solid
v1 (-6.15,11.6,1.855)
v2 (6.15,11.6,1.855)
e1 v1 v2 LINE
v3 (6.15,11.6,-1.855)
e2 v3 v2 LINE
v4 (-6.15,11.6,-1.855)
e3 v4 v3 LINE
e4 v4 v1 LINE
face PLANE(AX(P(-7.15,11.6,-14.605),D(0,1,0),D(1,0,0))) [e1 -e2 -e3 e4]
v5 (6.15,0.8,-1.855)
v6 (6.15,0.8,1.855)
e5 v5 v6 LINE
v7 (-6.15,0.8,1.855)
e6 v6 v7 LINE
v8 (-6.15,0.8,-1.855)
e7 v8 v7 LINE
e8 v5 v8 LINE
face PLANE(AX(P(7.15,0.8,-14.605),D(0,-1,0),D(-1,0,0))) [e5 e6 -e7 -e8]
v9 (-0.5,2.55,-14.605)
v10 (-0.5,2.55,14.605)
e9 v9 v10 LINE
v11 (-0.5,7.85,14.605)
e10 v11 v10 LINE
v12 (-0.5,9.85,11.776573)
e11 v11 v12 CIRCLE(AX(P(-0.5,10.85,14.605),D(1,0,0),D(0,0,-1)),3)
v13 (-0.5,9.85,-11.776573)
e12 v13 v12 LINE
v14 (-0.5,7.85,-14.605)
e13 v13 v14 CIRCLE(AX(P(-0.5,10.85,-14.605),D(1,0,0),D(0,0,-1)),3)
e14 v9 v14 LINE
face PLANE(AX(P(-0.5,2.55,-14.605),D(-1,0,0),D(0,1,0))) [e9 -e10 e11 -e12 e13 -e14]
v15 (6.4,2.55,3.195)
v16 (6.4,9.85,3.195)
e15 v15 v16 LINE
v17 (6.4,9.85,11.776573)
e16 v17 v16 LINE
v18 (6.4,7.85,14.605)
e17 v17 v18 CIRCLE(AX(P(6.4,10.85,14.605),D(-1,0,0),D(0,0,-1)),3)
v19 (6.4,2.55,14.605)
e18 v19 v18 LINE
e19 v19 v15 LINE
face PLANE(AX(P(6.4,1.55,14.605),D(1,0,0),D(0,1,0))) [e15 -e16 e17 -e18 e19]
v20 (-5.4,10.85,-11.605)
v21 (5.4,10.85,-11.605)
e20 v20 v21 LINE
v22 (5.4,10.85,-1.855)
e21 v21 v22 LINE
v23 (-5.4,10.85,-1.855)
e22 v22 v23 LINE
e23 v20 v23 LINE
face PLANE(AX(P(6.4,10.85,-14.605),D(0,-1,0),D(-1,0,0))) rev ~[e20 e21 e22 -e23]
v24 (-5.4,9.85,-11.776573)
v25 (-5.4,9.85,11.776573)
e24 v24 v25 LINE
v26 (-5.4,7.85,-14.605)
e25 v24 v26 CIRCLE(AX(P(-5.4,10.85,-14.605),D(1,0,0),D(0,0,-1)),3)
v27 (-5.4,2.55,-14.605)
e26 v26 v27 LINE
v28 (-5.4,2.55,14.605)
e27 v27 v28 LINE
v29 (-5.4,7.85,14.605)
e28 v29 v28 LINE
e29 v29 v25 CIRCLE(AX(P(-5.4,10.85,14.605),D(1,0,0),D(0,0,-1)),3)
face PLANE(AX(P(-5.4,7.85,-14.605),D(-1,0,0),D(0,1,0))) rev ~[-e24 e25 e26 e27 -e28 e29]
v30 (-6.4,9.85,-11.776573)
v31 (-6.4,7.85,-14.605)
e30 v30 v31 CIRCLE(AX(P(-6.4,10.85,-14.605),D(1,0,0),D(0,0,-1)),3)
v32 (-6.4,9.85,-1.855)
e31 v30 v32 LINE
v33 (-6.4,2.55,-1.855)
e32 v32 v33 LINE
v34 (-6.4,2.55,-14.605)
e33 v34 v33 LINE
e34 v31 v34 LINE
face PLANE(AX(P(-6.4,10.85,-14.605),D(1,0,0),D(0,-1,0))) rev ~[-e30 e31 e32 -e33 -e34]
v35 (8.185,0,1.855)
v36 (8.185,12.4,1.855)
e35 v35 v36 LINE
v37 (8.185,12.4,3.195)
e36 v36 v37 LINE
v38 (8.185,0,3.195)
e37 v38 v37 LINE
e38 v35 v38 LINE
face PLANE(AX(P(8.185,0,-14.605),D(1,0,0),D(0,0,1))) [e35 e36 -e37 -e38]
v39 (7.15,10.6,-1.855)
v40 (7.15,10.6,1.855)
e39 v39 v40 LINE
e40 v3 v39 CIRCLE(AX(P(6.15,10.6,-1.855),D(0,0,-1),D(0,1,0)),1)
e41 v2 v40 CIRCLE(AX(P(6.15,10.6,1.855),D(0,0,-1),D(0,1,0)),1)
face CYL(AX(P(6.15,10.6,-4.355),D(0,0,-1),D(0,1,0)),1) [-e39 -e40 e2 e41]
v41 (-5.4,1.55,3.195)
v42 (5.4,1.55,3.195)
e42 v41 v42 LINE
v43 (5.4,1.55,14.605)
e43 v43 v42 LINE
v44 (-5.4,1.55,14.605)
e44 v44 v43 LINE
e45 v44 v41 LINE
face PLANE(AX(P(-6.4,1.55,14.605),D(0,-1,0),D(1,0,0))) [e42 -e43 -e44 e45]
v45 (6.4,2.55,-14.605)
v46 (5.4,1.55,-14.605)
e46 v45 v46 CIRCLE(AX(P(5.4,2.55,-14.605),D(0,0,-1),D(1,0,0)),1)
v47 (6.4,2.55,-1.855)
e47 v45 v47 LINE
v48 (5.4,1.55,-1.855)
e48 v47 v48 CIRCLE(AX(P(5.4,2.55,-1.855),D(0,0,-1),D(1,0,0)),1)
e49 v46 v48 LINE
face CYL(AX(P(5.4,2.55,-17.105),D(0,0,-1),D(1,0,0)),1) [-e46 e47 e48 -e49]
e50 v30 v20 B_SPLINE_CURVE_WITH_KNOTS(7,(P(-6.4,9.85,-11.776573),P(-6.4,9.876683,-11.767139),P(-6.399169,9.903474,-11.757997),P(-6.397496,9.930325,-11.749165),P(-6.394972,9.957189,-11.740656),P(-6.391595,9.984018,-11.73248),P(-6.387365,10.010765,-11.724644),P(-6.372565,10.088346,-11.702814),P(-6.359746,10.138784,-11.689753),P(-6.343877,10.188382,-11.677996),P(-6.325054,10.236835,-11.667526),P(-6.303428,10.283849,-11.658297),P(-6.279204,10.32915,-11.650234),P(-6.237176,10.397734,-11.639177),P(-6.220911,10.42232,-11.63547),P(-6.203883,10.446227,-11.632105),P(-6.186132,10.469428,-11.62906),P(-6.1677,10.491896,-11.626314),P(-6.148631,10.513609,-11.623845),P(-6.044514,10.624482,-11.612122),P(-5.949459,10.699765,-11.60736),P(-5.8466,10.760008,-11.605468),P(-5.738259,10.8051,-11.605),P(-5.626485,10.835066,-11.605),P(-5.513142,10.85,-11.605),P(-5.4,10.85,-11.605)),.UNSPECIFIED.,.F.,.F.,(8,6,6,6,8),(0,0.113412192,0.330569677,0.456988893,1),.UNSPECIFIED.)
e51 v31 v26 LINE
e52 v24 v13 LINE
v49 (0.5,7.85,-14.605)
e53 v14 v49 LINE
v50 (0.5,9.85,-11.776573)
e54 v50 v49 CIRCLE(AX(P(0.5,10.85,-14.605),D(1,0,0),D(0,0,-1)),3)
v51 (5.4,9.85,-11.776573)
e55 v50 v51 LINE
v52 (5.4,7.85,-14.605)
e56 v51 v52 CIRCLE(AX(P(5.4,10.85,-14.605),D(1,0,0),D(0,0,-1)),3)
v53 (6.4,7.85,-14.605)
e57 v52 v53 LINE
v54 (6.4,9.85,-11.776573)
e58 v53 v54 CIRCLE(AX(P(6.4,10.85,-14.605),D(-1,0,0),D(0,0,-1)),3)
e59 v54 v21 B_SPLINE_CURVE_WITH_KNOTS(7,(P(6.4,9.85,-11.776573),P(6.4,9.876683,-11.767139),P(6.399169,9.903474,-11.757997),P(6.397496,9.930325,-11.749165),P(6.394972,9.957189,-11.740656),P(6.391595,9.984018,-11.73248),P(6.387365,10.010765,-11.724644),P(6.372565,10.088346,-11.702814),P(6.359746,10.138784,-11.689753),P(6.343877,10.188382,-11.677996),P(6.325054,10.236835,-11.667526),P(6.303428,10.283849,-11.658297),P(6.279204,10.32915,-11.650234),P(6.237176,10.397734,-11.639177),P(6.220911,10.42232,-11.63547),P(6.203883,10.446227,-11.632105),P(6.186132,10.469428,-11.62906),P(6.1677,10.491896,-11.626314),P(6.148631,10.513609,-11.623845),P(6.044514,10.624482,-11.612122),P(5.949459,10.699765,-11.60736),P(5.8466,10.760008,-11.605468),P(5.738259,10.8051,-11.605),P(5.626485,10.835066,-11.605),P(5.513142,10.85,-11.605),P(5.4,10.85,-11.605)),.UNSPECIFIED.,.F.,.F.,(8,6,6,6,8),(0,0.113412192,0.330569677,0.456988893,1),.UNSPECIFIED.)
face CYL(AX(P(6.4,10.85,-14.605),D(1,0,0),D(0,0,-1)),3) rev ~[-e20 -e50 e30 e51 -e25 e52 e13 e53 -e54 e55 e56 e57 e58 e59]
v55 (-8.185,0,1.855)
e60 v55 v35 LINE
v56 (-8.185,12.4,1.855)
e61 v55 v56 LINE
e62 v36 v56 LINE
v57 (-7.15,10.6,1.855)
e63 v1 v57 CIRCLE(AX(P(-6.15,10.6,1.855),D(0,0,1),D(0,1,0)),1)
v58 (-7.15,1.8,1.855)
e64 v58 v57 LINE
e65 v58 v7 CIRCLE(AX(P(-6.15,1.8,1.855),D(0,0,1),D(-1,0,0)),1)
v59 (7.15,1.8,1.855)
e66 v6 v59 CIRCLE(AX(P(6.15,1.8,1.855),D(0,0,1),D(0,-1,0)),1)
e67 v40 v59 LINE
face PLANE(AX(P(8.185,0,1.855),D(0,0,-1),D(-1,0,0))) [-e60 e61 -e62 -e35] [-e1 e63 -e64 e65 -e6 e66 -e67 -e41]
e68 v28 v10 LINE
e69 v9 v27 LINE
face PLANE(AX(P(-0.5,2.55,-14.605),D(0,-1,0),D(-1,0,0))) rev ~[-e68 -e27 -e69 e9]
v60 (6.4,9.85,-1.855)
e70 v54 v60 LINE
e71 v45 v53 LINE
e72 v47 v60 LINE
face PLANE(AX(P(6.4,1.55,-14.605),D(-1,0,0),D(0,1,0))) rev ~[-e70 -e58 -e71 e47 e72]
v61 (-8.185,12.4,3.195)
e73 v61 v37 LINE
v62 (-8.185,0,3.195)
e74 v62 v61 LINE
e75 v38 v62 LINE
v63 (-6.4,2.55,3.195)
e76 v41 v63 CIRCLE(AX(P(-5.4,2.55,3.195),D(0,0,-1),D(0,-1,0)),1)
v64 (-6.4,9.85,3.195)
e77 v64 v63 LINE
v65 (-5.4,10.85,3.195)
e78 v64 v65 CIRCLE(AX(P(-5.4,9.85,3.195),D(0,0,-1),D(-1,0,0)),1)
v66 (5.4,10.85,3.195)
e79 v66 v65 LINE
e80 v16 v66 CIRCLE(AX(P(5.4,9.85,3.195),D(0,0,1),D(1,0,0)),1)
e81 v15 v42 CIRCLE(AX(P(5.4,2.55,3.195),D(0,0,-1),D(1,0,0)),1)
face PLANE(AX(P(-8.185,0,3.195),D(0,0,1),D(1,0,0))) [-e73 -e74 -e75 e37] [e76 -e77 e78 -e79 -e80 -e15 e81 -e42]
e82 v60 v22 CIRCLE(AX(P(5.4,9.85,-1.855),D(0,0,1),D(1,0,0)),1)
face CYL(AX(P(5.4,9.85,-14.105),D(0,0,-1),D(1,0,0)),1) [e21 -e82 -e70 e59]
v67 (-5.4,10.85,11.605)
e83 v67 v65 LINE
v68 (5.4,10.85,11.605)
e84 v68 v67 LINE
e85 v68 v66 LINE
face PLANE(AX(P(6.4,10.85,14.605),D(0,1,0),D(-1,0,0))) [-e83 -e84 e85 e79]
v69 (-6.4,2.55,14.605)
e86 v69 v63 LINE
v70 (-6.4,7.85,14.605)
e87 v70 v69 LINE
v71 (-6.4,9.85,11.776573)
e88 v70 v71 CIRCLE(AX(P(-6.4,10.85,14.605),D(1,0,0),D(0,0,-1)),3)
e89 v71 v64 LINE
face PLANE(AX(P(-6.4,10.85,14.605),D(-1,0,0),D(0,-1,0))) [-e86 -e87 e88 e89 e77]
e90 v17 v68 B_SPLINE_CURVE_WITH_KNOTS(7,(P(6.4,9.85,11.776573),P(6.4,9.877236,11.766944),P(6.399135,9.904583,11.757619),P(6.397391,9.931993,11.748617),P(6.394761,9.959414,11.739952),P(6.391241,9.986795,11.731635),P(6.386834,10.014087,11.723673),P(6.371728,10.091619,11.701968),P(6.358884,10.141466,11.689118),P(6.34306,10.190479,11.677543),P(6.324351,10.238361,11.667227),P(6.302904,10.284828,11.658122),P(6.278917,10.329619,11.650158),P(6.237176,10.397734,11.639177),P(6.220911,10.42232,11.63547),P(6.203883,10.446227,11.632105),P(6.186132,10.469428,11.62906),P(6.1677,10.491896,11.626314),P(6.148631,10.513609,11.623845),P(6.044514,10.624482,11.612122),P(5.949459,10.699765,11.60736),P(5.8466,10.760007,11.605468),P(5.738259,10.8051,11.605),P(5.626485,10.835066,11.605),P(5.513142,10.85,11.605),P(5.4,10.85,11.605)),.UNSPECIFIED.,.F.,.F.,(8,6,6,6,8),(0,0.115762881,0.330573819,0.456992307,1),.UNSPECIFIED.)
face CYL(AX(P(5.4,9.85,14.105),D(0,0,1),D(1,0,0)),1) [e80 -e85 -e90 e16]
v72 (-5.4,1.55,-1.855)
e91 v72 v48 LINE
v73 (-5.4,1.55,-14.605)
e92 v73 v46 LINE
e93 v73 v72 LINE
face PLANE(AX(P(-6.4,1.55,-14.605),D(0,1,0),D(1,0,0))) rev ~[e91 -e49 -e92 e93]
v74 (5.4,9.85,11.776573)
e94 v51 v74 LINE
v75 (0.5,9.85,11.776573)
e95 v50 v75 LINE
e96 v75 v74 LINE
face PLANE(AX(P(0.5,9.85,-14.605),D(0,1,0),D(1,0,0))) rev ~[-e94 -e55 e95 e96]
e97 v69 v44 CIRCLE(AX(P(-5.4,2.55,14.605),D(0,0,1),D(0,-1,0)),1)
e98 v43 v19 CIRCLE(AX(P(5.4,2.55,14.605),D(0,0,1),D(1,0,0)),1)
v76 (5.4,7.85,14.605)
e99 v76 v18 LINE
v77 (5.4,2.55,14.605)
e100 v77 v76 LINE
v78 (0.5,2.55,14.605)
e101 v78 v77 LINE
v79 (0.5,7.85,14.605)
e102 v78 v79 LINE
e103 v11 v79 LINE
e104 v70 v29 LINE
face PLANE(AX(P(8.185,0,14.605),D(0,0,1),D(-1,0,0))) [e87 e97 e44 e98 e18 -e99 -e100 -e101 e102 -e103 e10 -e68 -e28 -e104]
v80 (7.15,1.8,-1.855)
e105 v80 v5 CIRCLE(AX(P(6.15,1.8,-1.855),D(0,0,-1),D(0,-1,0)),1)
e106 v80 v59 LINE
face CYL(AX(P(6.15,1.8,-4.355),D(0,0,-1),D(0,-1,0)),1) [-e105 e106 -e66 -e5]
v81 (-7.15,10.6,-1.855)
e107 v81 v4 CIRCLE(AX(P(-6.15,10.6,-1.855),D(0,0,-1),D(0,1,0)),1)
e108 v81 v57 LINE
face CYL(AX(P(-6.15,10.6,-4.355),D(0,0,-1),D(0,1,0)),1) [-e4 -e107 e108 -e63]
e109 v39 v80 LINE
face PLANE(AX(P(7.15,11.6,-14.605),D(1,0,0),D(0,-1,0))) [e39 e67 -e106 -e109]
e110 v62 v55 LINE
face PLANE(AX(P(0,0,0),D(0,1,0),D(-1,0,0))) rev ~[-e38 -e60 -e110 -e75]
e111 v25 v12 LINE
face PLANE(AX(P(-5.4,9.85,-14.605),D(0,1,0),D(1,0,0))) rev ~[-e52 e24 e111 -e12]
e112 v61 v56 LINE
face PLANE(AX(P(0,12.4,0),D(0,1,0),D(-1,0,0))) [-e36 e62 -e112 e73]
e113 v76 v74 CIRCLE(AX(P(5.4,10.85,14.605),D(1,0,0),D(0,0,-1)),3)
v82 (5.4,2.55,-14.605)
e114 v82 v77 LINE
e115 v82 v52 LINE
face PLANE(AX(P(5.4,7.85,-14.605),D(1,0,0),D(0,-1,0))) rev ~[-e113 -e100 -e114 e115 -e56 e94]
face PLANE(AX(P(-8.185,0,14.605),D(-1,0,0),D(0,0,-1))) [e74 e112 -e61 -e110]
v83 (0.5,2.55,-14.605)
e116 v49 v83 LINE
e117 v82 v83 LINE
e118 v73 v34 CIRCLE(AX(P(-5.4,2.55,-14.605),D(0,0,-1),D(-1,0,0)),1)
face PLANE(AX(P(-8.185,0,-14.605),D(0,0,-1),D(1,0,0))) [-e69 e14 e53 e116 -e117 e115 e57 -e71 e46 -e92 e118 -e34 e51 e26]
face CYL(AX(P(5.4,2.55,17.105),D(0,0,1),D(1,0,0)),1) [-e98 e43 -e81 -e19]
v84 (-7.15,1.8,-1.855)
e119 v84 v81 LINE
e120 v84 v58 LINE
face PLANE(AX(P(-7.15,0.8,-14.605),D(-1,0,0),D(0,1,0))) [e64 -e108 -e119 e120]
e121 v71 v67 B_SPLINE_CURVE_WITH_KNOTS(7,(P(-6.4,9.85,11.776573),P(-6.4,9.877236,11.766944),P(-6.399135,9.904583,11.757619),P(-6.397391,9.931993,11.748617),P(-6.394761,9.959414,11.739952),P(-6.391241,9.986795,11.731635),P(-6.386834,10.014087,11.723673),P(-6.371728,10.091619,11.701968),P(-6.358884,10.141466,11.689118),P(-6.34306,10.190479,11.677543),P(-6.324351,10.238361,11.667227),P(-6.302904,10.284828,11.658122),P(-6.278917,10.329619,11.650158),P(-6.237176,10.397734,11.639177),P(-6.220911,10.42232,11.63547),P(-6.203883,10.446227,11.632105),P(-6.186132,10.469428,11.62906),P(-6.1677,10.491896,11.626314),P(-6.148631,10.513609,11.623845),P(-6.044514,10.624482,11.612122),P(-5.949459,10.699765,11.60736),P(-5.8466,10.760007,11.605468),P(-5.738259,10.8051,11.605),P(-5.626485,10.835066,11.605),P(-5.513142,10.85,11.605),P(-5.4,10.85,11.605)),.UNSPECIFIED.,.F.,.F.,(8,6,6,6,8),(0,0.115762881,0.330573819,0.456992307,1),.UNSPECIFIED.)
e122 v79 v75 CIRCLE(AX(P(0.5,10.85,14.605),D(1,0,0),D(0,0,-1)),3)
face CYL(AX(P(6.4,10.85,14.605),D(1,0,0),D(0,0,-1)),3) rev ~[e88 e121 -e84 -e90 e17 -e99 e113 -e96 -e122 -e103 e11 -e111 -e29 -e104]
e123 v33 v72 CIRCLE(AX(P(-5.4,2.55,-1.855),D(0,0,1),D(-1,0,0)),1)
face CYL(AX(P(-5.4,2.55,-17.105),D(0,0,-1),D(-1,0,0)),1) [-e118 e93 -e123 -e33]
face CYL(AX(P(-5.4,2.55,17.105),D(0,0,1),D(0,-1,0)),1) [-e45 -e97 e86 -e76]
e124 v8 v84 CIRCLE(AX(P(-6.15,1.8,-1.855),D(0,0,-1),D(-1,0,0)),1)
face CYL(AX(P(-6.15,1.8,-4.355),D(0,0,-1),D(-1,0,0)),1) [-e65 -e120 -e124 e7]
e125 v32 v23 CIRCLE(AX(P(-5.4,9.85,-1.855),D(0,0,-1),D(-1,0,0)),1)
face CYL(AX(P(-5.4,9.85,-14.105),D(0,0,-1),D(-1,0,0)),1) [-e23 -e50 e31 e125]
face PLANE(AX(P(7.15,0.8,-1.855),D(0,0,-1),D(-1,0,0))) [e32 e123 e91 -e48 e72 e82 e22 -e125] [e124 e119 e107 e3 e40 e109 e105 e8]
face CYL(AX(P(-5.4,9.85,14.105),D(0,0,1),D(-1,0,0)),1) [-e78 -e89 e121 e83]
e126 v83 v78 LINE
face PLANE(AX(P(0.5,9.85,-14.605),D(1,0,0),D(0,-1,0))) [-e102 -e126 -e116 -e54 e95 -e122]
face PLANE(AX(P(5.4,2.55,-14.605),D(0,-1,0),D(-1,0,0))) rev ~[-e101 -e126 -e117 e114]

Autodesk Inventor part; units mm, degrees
ref_plane "YZ Plane" through (0, 0, 0) normal (1, 0, 0) x (0, 1, 0)
ref_plane "XZ Plane" through (0, 0, 0) normal (0, 1, 0) x (-1, 0, 0)
ref_plane "XY Plane" through (0, 0, 0) normal (0, 0, 1) x (1, 0, 0)
sketch "Sketch1" plane through (0, 0, 0) normal (0, 1, 0) x (-1, 0, 0)
  line L0 (-8.185, 14.605) -> (8.185, 14.605)
  line L1 (8.185, 14.605) -> (8.185, -14.605)
  line L2 (8.185, -14.605) -> (-8.185, -14.605)
  line L3 (-8.185, -14.605) -> (-8.185, 14.605)
  line L4 (-8.185, 14.605) -> (8.185, -14.605) construction
  line L5 (8.185, 14.605) -> (-8.185, -14.605) construction
  point P0 (0, 0)
  dimension "d0" = 16.37
  dimension "d1" = 29.21
extrude "Extrusion1" add sketch "Sketch1" along normal blind 12.4
sketch "Sketch2" plane through (-8.185, 0, 14.605) normal (0, 0, 1) x (1, 0, 0)
  line L0 (16.37, 0) -> (0, 0) projected
  line L1 (16.37, 0) -> (16.37, 12.4) projected
  line L2 (0, 12.4) -> (16.37, 12.4) projected
  line L3 (0, 0) -> (0, 12.4) projected
  line L4 (0, 12.4) -> (16.37, 12.4) projected
  line L5 (16.37, 12.4) -> (0, 0) construction
  line L6 (0, 12.4) -> (16.37, 0) construction
  line L7 (1.785, 1.55) -> (14.585, 1.55)
  line L8 (14.585, 1.55) -> (14.585, 10.85)
  line L9 (14.585, 10.85) -> (1.785, 10.85)
  line L10 (1.785, 10.85) -> (1.785, 1.55)
  line L11 (1.785, 1.55) -> (14.585, 10.85) construction
  line L12 (14.585, 1.55) -> (1.785, 10.85) construction
  point P0 (8.185, 0)
  point P1 (8.185, 6.2)
  dimension "d4" = 12.8
  dimension "d5" = 9.3
extrude "Extrusion2" cut sketch "Sketch2" against normal blind 11.41
sketch "Sketch3" plane through (8.185, 0, -14.605) normal (0, 0, -1) x (-1, 0, 0)
  line L0 (16.37, 0) -> (0, 0) projected
  line L1 (16.37, 0) -> (16.37, 12.4) projected
  line L2 (0, 12.4) -> (16.37, 12.4) projected
  line L3 (0, 0) -> (0, 12.4) projected
  line L4 (1.785, 10.85) -> (14.585, 10.85) projected
  line L5 (1.785, 1.55) -> (1.785, 10.85) projected
  line L6 (14.585, 1.55) -> (1.785, 1.55) projected
  line L7 (14.585, 10.85) -> (14.585, 1.55) projected
  line L8 (15.335, 11.6) -> (1.035, 11.6)
  line L9 (1.035, 11.6) -> (1.035, 0.8)
  line L10 (1.035, 0.8) -> (15.335, 0.8)
  line L11 (15.335, 0.8) -> (15.335, 11.6)
  point P0 (8.185, 0)
  dimension "d8" = 10.8
extrude "Extrusion3" cut sketch "Sketch3" against normal blind 16.46 contours L0 L3 L2 L1
sketch "Sketch4" plane through (7.15, 0.8, -14.605) normal (0, 0, -1) x (-1, 0, 0)
  line L0 (0.75, 10.05) -> (13.55, 10.05) projected
  line L1 (13.55, 10.05) -> (13.55, 0.75) projected
  line L2 (13.55, 0.75) -> (0.75, 0.75) projected
  line L3 (0.75, 0.75) -> (0.75, 10.05) projected
  line L4 (0, 10.8) -> (0, 0) projected
  line L5 (0, 0) -> (14.3, 0) projected
  line L6 (14.3, 0) -> (14.3, 10.8) projected
  line L7 (14.3, 10.8) -> (0, 10.8) projected
  point P0 (7.15, -0.8)
extrude "Extrusion4" cut sketch "Sketch4" against normal blind 12.75
sketch "Sketch5" plane through (6.4, 1.55, -14.605) normal (1, 0, 0) x (0, 0, -1)
  line L0 (-29.21, 0) -> (-29.21, 9.3) projected
  line L1 (-29.21, 0) -> (-17.8, 0) projected
  line L2 (-17.8, 0) -> (-17.8, 9.3) projected
  line L3 (-29.21, 9.3) -> (-17.8, 9.3) projected
  line L4 (0, 9.3) -> (0, 0) projected
  line L5 (0, 9.3) -> (-12.75, 9.3) projected
  line L6 (-12.75, 9.3) -> (-12.75, 0) projected
  line L7 (0, 0) -> (-12.75, 0) projected
  circle A0 centre (-29.21, 9.3) radius 3
  line L8 (0, 0) -> (0, 9.3) projected
  circle A1 centre (0, 9.3) radius 3
  point P0 (-14.605, -1.55)
  dimension "d13" = 6
  dimension "d14" = 6
extrude "Extrusion5" cut sketch "Sketch5" against normal through all contours A0 L3 L0 | L0 L3 A0 | L5 A1 L4 | L4 A1 L5
sketch "Sketch6" plane through (6.4, 1.55, -14.605) normal (0, 0, -1) x (-1, 0, 0)
  line L0 (0, 9.3) -> (12.8, 9.3) projected
  line L1 (0, 6.3) -> (0, 9.3) projected
  line L2 (0, 6.3) -> (0, 0) projected
  line L3 (12.8, 0) -> (12.8, 6.3) projected
  line L4 (12.8, 9.3) -> (12.8, 6.3) projected
  line L5 (0, 0) -> (12.8, 0) projected
  line L6 (11.8, 8.3) -> (1, 8.3)
  line L7 (1, 8.3) -> (1, 6.3)
  line L8 (1, 6.3) -> (1, 1)
  line L9 (1, 1) -> (11.8, 1)
  line L10 (11.8, 1) -> (11.8, 6.3)
  line L11 (11.8, 6.3) -> (11.8, 8.3)
  line L12 (1, 8.3) -> (11.8, 1) construction
  line L13 (1, 1) -> (11.8, 8.3) construction
  line L14 (5.9, 1) -> (6.9, 1)
  line L15 (6.9, 1) -> (6.9, 8.3)
  line L16 (6.9, 8.3) -> (5.9, 8.3)
  line L17 (5.9, 8.3) -> (5.9, 1)
  line L18 (5.9, 1) -> (6.9, 8.3) construction
  line L19 (6.9, 1) -> (5.9, 8.3) construction
  point P0 (6.4, -1.55)
  point P1 (6.4, 4.65)
  dimension "d17" = 1
  dimension "d18" = 1
extrude "Extrusion6" cut sketch "Sketch6" against normal through all contours L11 L10 L9 L15 L6 | L17 L9 L8 L7 L6
fillet "Fillet1" radius 1 12 edges at (7.15, 11.6, 0) (6.4, 10.85, -6.73) (-7.15, 11.6, 0) (-6.4, 10.85, -6.73) (6.4, 10.85, 7.4) (6.4, 1.55, 8.9) (6.4, 1.55, -8.23) (-6.4, 1.55, -8.23) (-7.15, 0.8, 0) (7.15, 0.8, 0) (-6.4, 1.55, 8.9) (-6.4, 10.85, 7.4)
properties part number "lcLcCoupler" material "Stainless Steel"
